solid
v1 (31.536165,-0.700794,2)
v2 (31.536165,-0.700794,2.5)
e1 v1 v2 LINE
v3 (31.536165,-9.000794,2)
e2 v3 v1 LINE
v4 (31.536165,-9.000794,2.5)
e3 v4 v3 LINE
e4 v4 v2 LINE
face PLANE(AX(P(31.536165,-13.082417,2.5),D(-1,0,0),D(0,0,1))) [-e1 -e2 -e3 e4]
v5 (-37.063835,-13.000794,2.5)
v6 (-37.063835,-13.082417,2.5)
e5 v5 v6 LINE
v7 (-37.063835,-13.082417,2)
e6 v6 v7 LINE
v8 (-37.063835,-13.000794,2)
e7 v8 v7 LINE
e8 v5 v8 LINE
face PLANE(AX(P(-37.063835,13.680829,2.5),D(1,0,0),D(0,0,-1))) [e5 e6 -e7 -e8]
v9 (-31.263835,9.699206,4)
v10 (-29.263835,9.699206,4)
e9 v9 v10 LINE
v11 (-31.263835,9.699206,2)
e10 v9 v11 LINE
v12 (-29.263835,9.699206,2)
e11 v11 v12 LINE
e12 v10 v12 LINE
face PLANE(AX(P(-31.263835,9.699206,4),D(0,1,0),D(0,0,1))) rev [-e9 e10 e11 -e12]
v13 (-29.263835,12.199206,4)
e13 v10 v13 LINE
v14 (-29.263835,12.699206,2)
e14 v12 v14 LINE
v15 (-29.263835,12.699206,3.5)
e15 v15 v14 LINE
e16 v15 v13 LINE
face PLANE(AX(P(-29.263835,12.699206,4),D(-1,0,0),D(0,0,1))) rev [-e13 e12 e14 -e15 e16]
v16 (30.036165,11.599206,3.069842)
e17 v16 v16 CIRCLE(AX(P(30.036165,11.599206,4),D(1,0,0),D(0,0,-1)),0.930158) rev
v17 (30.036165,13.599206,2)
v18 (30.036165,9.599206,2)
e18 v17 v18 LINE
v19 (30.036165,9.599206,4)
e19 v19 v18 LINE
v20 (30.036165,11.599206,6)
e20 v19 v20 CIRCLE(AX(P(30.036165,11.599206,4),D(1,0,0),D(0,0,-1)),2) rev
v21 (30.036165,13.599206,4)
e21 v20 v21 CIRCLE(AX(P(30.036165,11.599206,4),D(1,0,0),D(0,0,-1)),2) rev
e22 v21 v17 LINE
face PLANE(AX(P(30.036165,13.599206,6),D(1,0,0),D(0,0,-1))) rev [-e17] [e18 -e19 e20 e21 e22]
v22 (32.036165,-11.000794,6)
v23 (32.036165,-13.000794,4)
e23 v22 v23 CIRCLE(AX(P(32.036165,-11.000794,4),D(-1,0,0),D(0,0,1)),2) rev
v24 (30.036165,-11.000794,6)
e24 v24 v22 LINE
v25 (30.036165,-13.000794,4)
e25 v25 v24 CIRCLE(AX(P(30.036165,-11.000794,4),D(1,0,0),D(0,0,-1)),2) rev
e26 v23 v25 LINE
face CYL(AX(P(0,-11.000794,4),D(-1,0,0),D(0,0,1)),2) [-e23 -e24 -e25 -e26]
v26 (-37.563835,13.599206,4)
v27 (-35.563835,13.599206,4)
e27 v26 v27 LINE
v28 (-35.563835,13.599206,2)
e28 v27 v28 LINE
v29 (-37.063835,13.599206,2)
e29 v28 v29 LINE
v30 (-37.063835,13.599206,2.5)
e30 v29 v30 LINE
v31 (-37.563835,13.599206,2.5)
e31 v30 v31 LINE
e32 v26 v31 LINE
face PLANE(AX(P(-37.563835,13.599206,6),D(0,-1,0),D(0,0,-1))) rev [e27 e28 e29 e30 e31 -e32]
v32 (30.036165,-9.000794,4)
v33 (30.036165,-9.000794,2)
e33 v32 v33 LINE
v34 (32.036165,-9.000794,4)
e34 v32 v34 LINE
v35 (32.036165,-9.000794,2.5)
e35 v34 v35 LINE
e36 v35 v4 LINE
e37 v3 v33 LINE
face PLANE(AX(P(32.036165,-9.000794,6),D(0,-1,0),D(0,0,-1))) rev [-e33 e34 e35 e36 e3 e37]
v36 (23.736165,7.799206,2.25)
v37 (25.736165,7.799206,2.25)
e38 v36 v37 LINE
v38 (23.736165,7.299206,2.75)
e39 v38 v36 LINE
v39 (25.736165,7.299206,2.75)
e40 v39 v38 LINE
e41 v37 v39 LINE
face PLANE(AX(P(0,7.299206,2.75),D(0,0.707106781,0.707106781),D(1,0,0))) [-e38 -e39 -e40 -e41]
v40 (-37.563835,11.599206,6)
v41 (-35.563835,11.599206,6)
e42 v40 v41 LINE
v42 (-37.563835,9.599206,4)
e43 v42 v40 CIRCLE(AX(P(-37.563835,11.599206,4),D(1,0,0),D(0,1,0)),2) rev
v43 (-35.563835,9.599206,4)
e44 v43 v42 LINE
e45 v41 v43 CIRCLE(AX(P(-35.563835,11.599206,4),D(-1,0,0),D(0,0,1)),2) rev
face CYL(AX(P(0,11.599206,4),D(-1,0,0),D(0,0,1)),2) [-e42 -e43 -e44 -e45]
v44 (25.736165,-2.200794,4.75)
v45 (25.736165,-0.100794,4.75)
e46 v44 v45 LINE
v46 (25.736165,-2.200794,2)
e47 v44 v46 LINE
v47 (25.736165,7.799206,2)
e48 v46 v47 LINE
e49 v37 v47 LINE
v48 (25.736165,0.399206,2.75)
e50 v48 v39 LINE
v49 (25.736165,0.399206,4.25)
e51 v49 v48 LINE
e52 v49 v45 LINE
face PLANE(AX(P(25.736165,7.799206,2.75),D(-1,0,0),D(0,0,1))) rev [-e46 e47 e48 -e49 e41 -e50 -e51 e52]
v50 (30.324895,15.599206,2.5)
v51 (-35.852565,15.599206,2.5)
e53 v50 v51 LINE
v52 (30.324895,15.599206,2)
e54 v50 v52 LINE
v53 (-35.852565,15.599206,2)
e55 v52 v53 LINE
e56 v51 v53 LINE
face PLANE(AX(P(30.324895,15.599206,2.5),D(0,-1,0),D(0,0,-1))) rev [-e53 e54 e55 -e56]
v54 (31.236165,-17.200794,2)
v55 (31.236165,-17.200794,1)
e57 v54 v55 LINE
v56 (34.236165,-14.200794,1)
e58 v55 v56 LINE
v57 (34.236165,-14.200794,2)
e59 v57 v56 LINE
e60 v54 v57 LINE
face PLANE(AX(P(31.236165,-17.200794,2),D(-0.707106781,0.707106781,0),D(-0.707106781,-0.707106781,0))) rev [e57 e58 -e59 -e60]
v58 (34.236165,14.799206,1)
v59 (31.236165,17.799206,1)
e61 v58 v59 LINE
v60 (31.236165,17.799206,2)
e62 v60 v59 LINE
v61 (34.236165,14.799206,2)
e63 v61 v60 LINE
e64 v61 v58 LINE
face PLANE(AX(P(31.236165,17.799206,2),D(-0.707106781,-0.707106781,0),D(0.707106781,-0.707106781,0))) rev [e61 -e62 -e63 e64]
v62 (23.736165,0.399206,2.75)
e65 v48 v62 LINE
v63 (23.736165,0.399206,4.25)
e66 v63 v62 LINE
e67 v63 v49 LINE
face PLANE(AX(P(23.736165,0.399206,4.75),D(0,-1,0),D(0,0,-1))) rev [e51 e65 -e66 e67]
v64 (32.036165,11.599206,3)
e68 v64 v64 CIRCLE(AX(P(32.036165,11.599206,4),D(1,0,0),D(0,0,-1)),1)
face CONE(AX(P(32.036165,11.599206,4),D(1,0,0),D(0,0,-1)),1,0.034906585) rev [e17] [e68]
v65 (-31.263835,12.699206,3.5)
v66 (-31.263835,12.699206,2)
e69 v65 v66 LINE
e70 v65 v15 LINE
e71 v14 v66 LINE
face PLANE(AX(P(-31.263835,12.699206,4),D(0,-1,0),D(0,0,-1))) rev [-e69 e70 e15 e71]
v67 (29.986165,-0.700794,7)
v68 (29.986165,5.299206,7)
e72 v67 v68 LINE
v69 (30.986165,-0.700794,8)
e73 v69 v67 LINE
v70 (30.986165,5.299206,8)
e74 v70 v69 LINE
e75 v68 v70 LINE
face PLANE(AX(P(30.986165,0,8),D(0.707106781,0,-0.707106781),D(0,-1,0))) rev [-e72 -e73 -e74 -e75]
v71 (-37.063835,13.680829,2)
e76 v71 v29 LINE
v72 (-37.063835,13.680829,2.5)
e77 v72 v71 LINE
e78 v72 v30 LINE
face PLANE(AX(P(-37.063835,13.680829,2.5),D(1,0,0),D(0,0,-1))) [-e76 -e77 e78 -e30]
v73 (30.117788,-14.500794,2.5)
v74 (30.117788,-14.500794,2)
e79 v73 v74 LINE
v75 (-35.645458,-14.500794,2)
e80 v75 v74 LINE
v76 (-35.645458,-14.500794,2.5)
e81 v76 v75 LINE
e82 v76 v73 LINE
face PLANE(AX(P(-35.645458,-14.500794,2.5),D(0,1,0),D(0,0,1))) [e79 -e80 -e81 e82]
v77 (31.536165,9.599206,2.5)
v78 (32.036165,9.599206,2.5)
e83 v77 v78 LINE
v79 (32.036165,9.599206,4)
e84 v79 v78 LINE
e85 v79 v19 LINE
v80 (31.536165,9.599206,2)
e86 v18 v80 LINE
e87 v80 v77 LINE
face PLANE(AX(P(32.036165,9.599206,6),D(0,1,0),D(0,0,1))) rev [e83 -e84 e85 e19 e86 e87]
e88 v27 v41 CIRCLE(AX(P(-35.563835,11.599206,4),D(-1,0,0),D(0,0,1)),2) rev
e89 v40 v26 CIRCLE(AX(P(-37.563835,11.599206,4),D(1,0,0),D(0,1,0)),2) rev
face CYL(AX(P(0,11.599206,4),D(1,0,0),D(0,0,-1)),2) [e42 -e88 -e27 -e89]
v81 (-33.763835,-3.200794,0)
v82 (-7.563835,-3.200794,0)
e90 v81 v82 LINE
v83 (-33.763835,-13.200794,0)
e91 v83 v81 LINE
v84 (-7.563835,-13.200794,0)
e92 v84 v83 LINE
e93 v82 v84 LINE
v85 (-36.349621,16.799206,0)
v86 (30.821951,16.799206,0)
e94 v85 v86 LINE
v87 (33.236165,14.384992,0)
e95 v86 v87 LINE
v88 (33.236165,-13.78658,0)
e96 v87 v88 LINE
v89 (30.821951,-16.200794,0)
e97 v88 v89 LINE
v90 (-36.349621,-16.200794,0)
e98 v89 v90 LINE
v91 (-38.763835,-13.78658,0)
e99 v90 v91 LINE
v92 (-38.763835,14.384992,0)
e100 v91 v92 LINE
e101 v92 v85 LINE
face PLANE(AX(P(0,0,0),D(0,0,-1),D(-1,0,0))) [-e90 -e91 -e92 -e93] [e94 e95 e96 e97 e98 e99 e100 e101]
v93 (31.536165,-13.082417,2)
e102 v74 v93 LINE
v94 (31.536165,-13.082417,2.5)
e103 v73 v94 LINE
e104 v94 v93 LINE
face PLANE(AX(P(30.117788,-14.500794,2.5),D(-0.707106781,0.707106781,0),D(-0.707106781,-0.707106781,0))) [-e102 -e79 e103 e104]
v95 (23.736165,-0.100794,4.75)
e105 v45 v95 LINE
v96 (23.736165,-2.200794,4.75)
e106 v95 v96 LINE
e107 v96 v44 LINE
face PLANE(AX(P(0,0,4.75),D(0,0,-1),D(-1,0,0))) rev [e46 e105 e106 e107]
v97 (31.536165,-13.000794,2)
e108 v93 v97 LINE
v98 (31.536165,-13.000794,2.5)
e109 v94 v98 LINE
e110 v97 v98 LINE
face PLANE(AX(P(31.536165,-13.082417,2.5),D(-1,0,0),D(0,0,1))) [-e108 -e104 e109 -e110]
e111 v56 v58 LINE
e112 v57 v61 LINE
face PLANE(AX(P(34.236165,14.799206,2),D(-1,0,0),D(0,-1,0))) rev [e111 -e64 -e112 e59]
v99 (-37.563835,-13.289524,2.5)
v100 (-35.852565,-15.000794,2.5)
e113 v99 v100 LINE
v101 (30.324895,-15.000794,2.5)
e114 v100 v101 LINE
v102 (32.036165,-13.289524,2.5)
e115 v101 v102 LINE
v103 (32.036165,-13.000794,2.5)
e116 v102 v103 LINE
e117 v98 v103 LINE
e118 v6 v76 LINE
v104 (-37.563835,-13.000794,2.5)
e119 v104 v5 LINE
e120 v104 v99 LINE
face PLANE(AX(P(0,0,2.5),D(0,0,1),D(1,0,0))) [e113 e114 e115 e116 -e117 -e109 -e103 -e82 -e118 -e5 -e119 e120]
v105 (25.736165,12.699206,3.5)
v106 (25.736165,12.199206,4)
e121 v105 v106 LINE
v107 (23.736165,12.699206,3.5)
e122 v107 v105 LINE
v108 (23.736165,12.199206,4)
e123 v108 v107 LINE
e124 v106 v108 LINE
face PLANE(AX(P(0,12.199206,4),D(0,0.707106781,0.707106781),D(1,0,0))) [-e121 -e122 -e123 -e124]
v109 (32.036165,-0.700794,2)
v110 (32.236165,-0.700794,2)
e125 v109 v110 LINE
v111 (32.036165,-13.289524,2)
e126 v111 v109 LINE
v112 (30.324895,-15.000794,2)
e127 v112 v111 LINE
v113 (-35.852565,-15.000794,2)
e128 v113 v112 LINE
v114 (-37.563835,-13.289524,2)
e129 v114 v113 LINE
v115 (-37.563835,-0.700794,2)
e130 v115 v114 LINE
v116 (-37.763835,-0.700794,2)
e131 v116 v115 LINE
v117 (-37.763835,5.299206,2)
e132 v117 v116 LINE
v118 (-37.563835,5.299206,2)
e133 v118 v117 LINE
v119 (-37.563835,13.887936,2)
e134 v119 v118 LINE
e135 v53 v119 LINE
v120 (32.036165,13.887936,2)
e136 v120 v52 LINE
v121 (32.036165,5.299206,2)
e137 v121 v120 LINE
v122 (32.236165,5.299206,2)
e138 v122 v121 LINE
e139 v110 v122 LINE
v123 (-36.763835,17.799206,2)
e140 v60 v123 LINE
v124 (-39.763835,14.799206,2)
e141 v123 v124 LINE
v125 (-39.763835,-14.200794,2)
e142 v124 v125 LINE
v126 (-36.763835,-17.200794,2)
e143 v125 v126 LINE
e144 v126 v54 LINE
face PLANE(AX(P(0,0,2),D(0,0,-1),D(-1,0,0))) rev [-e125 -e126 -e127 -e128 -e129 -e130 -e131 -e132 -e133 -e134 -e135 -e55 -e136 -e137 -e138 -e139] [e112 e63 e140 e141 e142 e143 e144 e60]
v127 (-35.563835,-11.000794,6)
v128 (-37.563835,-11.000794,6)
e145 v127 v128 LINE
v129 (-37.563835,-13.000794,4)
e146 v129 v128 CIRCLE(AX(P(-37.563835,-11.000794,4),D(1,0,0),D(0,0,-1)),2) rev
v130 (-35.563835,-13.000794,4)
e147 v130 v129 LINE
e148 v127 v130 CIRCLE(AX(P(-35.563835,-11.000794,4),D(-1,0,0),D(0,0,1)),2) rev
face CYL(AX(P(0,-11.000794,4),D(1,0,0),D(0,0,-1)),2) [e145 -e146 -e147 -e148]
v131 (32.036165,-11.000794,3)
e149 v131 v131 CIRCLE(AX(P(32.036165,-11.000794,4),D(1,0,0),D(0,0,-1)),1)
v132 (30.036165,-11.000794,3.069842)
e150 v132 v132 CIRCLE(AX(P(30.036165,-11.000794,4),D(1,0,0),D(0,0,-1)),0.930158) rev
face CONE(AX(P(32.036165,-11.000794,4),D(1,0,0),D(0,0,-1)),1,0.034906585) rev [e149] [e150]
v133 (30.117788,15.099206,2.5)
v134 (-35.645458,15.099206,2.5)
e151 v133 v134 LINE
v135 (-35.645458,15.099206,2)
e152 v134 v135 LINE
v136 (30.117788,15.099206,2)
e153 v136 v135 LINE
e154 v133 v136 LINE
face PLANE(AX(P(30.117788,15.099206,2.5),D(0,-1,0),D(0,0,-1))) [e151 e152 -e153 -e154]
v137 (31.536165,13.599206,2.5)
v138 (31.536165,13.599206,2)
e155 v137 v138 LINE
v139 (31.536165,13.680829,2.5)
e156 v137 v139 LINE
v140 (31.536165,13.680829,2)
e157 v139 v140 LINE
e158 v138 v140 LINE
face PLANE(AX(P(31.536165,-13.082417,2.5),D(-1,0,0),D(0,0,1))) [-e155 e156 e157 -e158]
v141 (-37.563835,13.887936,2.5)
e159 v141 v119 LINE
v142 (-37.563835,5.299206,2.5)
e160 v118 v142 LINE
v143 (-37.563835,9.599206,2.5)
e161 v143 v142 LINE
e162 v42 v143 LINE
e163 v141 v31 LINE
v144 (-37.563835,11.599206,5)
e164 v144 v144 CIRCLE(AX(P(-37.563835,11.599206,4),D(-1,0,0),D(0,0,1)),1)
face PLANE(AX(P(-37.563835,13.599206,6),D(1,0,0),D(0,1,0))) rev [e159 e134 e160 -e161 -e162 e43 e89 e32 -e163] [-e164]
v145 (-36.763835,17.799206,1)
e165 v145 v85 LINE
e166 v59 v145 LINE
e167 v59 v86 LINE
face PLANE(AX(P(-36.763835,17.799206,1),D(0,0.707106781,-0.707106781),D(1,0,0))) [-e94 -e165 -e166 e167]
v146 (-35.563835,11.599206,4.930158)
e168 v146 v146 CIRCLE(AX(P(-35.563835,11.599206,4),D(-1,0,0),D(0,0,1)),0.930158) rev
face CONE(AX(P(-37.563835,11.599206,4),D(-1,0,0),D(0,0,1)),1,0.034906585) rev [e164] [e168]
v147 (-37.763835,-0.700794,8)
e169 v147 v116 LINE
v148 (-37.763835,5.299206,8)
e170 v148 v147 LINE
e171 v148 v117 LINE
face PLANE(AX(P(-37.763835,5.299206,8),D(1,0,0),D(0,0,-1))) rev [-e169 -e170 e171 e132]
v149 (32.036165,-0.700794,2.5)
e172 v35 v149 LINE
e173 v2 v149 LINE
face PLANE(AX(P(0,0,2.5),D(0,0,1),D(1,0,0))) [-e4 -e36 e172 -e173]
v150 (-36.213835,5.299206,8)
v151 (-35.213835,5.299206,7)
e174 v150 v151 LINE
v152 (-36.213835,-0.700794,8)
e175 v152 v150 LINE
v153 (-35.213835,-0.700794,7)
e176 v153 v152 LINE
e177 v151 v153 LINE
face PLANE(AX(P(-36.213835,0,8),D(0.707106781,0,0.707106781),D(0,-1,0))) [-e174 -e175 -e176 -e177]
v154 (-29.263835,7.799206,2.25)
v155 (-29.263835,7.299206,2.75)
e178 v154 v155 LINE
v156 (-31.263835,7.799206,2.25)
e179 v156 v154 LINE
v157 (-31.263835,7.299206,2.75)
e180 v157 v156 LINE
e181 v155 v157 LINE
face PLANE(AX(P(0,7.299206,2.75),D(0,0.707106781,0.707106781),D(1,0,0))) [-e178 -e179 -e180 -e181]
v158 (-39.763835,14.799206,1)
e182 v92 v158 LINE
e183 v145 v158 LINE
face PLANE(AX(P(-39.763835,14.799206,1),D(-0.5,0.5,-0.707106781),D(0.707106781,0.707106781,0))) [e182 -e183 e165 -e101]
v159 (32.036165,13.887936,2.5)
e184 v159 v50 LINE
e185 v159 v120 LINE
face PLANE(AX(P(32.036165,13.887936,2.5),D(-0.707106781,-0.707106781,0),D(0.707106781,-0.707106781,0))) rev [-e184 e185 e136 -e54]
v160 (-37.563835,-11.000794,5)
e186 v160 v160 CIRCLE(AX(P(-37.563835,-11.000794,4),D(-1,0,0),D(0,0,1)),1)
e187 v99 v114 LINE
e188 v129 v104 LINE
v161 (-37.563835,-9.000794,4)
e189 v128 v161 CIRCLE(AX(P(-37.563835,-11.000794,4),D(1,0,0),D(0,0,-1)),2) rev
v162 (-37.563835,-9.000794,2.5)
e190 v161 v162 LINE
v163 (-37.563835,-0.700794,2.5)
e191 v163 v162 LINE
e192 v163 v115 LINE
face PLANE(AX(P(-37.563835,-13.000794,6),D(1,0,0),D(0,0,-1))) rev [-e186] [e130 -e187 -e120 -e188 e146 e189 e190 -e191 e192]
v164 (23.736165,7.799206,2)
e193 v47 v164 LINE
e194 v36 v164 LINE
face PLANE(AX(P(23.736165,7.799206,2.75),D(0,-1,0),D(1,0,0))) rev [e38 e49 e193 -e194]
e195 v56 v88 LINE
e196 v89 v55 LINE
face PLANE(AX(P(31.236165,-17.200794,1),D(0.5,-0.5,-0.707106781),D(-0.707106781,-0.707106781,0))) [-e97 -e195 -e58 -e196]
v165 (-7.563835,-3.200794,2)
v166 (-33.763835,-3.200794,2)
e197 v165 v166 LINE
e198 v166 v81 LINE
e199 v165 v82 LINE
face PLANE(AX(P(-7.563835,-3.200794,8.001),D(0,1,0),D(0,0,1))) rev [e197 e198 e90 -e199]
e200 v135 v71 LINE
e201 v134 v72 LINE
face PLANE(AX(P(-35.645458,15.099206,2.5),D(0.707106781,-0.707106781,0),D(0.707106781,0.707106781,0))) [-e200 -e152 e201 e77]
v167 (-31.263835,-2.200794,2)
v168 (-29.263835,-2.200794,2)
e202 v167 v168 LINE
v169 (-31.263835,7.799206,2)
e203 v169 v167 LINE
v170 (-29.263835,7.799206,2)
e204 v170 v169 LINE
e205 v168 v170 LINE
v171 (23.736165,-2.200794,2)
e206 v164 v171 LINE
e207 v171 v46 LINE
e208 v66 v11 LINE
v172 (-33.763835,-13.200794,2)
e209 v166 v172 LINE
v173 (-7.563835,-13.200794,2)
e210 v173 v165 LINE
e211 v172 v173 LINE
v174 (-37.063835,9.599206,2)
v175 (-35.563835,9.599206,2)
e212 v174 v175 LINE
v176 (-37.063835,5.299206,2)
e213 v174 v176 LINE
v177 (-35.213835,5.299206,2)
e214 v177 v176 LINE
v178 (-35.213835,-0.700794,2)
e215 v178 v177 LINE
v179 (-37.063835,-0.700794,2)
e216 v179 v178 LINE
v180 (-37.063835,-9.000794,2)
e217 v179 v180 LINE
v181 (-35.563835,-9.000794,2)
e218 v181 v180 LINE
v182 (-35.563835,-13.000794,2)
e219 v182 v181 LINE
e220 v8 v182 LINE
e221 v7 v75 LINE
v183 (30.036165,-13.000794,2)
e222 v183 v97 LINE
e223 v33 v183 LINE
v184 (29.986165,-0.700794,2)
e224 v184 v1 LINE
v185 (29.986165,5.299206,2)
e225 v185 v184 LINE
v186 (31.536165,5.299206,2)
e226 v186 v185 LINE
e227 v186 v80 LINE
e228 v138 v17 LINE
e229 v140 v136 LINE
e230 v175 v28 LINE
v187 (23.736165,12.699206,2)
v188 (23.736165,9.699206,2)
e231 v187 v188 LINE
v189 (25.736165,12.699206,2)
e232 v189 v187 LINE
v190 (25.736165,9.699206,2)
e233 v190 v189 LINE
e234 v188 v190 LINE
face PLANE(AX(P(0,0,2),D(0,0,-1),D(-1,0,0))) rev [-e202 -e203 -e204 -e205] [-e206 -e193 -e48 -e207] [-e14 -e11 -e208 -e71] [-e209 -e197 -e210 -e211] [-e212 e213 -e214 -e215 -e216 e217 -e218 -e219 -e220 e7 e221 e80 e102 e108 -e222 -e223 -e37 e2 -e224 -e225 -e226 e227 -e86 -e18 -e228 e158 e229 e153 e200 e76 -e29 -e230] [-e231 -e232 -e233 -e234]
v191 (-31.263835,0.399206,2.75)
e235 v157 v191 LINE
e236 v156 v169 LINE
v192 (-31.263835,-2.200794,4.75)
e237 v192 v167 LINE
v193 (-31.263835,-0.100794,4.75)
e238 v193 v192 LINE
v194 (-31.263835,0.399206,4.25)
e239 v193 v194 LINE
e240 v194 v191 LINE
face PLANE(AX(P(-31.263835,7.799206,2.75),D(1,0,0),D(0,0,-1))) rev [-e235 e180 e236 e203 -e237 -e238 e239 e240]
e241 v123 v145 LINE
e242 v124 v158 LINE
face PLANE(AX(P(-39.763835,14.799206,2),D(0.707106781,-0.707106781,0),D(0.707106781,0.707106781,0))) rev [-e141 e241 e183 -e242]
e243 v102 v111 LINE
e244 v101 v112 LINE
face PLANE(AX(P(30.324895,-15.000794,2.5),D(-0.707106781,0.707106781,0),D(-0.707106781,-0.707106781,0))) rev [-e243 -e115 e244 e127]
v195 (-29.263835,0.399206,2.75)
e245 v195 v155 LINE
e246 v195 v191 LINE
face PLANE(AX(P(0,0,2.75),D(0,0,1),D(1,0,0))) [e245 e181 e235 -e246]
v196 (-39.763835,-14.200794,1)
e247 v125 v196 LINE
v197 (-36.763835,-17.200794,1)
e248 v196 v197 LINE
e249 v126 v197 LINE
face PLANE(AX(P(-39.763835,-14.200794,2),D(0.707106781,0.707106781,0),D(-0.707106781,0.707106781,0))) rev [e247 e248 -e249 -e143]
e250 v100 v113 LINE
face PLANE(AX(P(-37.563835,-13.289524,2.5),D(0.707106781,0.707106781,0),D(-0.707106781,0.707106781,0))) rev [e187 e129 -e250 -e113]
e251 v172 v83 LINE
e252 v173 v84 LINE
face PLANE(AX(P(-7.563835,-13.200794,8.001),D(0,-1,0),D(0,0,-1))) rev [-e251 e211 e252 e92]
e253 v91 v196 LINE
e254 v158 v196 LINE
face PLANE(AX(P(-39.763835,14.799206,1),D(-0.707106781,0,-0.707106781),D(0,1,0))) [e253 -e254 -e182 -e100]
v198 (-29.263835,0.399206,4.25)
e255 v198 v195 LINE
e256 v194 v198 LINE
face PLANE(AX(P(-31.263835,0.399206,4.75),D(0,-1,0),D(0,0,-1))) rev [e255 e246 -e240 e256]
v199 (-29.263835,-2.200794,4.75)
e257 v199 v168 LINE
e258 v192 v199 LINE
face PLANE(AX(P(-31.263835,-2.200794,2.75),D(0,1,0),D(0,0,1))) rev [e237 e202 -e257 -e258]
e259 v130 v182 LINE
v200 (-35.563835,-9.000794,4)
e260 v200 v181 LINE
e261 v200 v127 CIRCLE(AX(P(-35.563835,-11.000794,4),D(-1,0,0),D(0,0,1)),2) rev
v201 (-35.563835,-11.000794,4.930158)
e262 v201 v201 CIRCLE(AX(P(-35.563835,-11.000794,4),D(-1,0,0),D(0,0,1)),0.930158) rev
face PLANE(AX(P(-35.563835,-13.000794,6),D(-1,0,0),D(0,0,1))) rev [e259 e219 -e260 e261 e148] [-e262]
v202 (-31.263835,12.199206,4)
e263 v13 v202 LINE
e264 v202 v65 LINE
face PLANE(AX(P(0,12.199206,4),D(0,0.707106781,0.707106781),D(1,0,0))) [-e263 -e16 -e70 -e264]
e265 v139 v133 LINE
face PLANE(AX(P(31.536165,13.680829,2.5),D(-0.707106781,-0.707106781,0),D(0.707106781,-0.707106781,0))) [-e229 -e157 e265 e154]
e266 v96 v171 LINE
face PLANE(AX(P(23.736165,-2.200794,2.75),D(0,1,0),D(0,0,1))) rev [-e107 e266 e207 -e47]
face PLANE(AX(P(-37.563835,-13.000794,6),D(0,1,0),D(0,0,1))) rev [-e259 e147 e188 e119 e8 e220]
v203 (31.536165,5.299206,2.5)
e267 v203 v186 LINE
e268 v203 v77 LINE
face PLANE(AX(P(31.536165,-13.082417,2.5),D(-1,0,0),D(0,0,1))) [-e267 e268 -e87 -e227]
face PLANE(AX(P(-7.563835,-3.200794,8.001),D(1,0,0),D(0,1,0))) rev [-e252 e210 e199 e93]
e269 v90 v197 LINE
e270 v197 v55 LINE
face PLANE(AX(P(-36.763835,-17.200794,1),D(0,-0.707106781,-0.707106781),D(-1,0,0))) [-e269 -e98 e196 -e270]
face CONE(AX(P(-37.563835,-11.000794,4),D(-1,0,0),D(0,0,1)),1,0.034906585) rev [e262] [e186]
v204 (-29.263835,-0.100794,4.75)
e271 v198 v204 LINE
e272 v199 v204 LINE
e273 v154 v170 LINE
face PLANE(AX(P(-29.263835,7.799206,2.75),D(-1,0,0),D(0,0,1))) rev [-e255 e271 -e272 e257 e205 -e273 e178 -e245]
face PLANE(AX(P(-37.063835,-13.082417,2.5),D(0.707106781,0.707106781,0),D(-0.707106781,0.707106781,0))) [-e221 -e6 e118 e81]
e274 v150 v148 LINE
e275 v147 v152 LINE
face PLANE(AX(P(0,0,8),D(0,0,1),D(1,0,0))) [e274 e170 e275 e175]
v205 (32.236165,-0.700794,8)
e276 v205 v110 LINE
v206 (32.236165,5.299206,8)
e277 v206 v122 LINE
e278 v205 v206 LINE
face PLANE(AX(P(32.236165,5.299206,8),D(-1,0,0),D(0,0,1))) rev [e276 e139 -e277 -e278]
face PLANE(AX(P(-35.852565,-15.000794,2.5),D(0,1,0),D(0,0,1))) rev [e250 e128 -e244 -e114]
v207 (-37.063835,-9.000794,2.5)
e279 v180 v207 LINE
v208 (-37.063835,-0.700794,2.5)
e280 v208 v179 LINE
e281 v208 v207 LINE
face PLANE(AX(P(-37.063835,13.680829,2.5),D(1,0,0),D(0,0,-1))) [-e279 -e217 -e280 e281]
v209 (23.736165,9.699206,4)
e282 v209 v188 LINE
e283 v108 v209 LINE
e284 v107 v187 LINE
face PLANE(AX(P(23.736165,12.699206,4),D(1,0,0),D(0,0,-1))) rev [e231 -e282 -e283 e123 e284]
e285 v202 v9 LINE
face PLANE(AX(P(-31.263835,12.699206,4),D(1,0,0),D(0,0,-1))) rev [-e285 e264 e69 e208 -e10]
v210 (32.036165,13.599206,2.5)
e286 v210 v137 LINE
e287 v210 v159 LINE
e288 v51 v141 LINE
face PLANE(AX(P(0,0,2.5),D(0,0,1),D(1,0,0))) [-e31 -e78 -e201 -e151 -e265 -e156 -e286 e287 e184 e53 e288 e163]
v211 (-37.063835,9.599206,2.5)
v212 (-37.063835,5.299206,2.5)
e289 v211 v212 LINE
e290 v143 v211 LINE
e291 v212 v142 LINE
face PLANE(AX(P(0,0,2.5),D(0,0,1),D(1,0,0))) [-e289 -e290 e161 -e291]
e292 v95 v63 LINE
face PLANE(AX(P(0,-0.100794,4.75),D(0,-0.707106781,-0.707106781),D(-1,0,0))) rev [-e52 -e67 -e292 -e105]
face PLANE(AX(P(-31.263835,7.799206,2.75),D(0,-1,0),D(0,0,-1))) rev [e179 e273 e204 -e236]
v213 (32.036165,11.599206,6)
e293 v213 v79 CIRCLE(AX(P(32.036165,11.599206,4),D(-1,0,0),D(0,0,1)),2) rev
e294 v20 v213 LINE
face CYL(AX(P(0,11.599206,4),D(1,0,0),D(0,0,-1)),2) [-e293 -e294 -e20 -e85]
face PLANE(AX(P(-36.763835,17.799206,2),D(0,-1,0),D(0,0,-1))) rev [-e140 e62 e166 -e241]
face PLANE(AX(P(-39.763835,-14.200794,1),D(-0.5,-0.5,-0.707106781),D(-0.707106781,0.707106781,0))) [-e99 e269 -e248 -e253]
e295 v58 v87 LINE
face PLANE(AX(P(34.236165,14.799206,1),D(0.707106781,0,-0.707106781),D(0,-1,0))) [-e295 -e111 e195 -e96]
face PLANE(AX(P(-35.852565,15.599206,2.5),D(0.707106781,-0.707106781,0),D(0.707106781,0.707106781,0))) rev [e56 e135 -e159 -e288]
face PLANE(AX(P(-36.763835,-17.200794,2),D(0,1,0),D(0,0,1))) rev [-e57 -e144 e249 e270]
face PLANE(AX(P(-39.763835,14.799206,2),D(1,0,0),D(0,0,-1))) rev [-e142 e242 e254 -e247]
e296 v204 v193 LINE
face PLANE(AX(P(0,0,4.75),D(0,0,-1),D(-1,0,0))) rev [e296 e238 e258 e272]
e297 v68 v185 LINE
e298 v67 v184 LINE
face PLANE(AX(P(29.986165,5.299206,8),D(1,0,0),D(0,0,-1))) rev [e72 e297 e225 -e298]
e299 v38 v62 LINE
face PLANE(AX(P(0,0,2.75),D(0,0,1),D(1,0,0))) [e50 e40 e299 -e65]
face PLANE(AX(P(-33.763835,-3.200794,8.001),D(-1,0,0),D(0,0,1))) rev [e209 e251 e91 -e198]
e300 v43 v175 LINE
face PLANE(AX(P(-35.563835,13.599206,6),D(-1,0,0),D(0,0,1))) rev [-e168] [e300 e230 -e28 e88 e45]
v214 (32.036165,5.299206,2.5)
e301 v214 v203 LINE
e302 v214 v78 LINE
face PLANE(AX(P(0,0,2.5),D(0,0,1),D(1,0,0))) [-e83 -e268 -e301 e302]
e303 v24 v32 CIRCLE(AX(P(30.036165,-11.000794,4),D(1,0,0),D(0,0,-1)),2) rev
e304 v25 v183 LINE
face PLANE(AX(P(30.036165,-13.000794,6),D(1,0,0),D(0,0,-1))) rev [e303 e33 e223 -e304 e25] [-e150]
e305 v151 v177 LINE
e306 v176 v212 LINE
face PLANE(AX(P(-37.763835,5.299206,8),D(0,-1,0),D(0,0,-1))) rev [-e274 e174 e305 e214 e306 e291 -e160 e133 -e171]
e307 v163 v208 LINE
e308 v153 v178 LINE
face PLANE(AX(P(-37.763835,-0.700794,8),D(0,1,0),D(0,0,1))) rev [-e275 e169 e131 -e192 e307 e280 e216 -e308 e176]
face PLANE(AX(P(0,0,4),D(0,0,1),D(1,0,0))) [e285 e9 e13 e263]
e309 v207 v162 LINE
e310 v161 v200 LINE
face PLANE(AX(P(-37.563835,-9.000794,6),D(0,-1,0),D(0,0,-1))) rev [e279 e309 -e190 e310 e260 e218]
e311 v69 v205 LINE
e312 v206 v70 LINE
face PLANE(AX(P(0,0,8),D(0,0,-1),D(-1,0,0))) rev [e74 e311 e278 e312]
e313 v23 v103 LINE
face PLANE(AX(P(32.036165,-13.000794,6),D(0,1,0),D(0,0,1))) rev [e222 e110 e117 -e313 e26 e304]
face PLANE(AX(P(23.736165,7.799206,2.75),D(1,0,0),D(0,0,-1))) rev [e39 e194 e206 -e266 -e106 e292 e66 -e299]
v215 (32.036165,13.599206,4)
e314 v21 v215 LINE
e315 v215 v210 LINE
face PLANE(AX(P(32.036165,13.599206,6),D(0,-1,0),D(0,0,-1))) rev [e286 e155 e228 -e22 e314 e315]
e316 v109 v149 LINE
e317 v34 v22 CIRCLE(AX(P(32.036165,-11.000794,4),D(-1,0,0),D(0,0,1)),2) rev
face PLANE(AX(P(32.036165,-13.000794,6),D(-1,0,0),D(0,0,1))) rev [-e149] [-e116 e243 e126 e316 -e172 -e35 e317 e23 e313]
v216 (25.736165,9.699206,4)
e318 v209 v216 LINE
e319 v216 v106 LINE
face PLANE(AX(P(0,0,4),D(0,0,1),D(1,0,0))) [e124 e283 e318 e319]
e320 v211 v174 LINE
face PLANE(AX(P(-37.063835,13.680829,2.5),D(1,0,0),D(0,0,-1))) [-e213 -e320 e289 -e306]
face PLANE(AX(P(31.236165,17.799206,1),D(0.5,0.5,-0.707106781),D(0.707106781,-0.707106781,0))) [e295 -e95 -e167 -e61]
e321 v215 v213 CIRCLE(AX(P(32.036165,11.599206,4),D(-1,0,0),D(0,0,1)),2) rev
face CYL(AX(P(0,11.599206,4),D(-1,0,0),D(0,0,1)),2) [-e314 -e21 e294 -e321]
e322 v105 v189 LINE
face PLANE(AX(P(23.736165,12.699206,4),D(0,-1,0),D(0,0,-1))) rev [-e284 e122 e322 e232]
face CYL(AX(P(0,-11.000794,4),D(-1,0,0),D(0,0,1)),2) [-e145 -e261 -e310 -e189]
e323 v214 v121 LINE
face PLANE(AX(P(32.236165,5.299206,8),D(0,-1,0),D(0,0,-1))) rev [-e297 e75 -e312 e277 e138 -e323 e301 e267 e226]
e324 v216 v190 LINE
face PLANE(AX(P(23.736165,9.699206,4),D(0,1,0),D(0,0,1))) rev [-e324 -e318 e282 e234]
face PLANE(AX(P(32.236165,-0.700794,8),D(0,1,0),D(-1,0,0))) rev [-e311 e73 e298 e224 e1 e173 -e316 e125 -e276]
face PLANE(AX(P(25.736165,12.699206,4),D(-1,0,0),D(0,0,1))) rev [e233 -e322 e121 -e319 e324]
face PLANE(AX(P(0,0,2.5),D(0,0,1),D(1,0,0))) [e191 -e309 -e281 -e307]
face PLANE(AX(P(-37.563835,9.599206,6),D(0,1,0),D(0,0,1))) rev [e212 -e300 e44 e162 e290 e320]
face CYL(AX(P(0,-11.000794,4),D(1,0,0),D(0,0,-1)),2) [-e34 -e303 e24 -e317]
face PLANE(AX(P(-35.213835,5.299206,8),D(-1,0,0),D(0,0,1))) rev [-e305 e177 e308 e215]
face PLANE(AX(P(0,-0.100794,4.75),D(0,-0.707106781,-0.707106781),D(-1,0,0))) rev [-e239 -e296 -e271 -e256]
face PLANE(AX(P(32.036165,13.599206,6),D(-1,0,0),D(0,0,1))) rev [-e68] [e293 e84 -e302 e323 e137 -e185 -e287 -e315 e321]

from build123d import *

# Parameters (mm, degrees)
EXTRUDE_1_DEPTH               = 2
CHAMFER_1_SIZE                = 1
SKETCH_3_W                    = 2
SKETCH_3_H                    = 4
EXTRUDE_2_DEPTH               = 4
FILLET_1_R                    = 2
SKETCH_4_R                    = 1
CUT_EXTRUDE_1_DEPTH           = 2
CUT_EXTRUDE_1_DRAFT           = -2
CUT_EXTRUDE_1_PROFILE_2_DEPTH = 2
CUT_EXTRUDE_1_PROFILE_2_DRAFT = -2
SKETCH_5_R                    = 1
CUT_EXTRUDE_2_DEPTH           = 2
CUT_EXTRUDE_2_DRAFT           = -2
CUT_EXTRUDE_2_PROFILE_2_DEPTH = 2
CUT_EXTRUDE_2_PROFILE_2_DRAFT = -2
SKETCH_6_W                    = 2
SKETCH_6_H                    = 10
EXTRUDE_3_DEPTH               = 0.75
SKETCH_7_W                    = 2
SKETCH_7_H                    = 2.6
EXTRUDE_4_DEPTH               = 2
CHAMFER_2_SIZE                = 0.5
SKETCH_8_W                    = 2.55
SKETCH_8_H                    = 6
SKETCH_8_W_2                  = 2.25
EXTRUDE_5_DEPTH               = 6
CHAMFER_3_SIZE                = 1
SKETCH_9_W                    = 2
SKETCH_9_H                    = 3
EXTRUDE_6_DEPTH               = 2
CHAMFER_4_SIZE                = 0.5
CUT_EXTRUDE_3_REACH           = 46.294
SKETCH_10_W                   = 26.2
SKETCH_10_H                   = 10
EXTRUDE_7_DEPTH               = 0.5


with BuildPart() as part:
    # 草图1 → 凸台-拉伸1 (new body)
    with BuildSketch(Plane.XY):
        Polygon((-39.76383505, 14.799206062), (-36.76383505, 17.799206062), (31.23616495, 17.799206062), (34.23616495, 14.799206062), (34.23616495, -14.200793938), (31.23616495, -17.200793938), (-36.76383505, -17.200793938), (-39.76383505, -14.200793938), align=None)
    extrude(amount=EXTRUDE_1_DEPTH)

    # 倒角1
    chamfer_1_edges = [part.edges().sort_by_distance(p)[0] for p in [
        (-38.26383505, -15.700793938, 0),
        (-39.76383505, 0.299206062, 0),
        (-38.26383505, 16.299206062, 0),
        (-2.76383505, 17.799206062, 0),
        (32.73616495, 16.299206062, 0),
        (34.23616495, 0.299206062, 0),
        (32.73616495, -15.700793938, 0),
        (-2.76383505, -17.200793938, 0),
    ]]
    chamfer(chamfer_1_edges, length=CHAMFER_1_SIZE)

    # 草图3 → 凸台-拉伸2 (add)
    with BuildSketch(Plane.XY.offset(2)):
        with Locations((-36.56383505, 11.599206062)):
            Rectangle(SKETCH_3_W, SKETCH_3_H)
        with Locations((-36.56383505, -11.000793938)):
            Rectangle(SKETCH_3_W, SKETCH_3_H)
        with Locations((31.03616495, 11.599206062)):
            Rectangle(SKETCH_3_W, SKETCH_3_H)
        with Locations((31.03616495, -11.000793938)):
            Rectangle(SKETCH_3_W, SKETCH_3_H)
    extrude(amount=EXTRUDE_2_DEPTH)

    # 圆角1
    fillet_1_edges = [part.edges().sort_by_distance(p)[0] for p in [
        (31.03616495, 13.599206062, 6),
        (31.03616495, 9.599206062, 6),
        (31.03616495, -9.000793938, 6),
        (31.03616495, -13.000793938, 6),
        (-36.56383505, -13.000793938, 6),
        (-36.56383505, -9.000793938, 6),
        (-36.56383505, 13.599206062, 6),
        (-36.56383505, 9.599206062, 6),
    ]]
    fillet(fillet_1_edges, radius=FILLET_1_R - 0.0001)  # a hair under: the kernel refuses the full size


with BuildPart() as cut_extrude_1_tool:
    # 草图4 → 切除-拉伸1 (with draft: the straight prism first)
    with BuildSketch(Plane(origin=(32.03616495, 0, 0), x_dir=(0, 0, -1), z_dir=(1, 0, 0))):
        with Locations((-4, 11.599206062)):
            Circle(SKETCH_4_R)
    extrude(amount=-CUT_EXTRUDE_1_DEPTH)
    # 切除-拉伸1: the draft: its side faces are tilted about the plane it starts from
    cut_extrude_1_sides = [cut_extrude_1_tool.faces().sort_by_distance(p)[0] for p in [
        (31.03616495, 11.599206062, 5),
    ]]
    draft(cut_extrude_1_sides, Plane(origin=(32.03616495, 0, 0), x_dir=(0, 0, -1), z_dir=(1, 0, 0)), CUT_EXTRUDE_1_DRAFT)


with BuildPart() as part_1:
    add(part.part)

    # 切除-拉伸1: cut by cut_extrude_1_tool
    add(cut_extrude_1_tool.part, mode=Mode.SUBTRACT)


with BuildPart() as cut_extrude_1_profile_2_tool:
    # 草图4 → 切除-拉伸1 profile 2 (with draft: the straight prism first)
    with BuildSketch(Plane(origin=(32.03616495, 0, 0), x_dir=(0, 0, -1), z_dir=(1, 0, 0))):
        with Locations((-4, -11.000793938)):
            Circle(SKETCH_4_R)
    extrude(amount=-CUT_EXTRUDE_1_PROFILE_2_DEPTH)
    # 切除-拉伸1 profile 2: the draft: its side faces are tilted about the plane it starts from
    cut_extrude_1_profile_2_sides = [cut_extrude_1_profile_2_tool.faces().sort_by_distance(p)[0] for p in [
        (31.03616495, -11.000793938, 5),
    ]]
    draft(cut_extrude_1_profile_2_sides, Plane(origin=(32.03616495, 0, 0), x_dir=(0, 0, -1), z_dir=(1, 0, 0)), CUT_EXTRUDE_1_PROFILE_2_DRAFT)


with BuildPart() as part_2:
    add(part_1.part)

    # 切除-拉伸1 profile 2: cut by cut_extrude_1_profile_2_tool
    add(cut_extrude_1_profile_2_tool.part, mode=Mode.SUBTRACT)


with BuildPart() as cut_extrude_2_tool:
    # 草图5 → 切除-拉伸2 (with draft: the straight prism first)
    with BuildSketch(Plane.ZY.offset(37.56383505)):
        with Locations((4, 11.599206062)):
            Circle(SKETCH_5_R)
    extrude(amount=-CUT_EXTRUDE_2_DEPTH)
    # 切除-拉伸2: the draft: its side faces are tilted about the plane it starts from
    cut_extrude_2_sides = [cut_extrude_2_tool.faces().sort_by_distance(p)[0] for p in [
        (-36.56383505, 11.599206062, 3),
    ]]
    draft(cut_extrude_2_sides, Plane.ZY.offset(37.56383505), CUT_EXTRUDE_2_DRAFT)


with BuildPart() as part_3:
    add(part_2.part)

    # 切除-拉伸2: cut by cut_extrude_2_tool
    add(cut_extrude_2_tool.part, mode=Mode.SUBTRACT)


with BuildPart() as cut_extrude_2_profile_2_tool:
    # 草图5 → 切除-拉伸2 profile 2 (with draft: the straight prism first)
    with BuildSketch(Plane.ZY.offset(37.56383505)):
        with Locations((4, -11.000793938)):
            Circle(SKETCH_5_R)
    extrude(amount=-CUT_EXTRUDE_2_PROFILE_2_DEPTH)
    # 切除-拉伸2 profile 2: the draft: its side faces are tilted about the plane it starts from
    cut_extrude_2_profile_2_sides = [cut_extrude_2_profile_2_tool.faces().sort_by_distance(p)[0] for p in [
        (-36.56383505, -11.000793938, 3),
    ]]
    draft(cut_extrude_2_profile_2_sides, Plane.ZY.offset(37.56383505), CUT_EXTRUDE_2_PROFILE_2_DRAFT)


with BuildPart() as part_4:
    add(part_3.part)

    # 切除-拉伸2 profile 2: cut by cut_extrude_2_profile_2_tool
    add(cut_extrude_2_profile_2_tool.part, mode=Mode.SUBTRACT)

    # 草图6 → 凸台-拉伸3 (add)
    with BuildSketch(Plane.XY.offset(2)):
        with Locations((-30.26383505, 2.799206062)):
            Rectangle(SKETCH_6_W, SKETCH_6_H)
        with Locations((24.73616495, 2.799206062)):
            Rectangle(SKETCH_6_W, SKETCH_6_H)
    extrude(amount=EXTRUDE_3_DEPTH)

    # 草图7 → 凸台-拉伸4 (add)
    with BuildSketch(Plane.XY.offset(2.75)):
        with Locations((-30.26383505, -0.900793938)):
            Rectangle(SKETCH_7_W, SKETCH_7_H)
        with Locations((24.73616495, -0.900793938)):
            Rectangle(SKETCH_7_W, SKETCH_7_H)
    extrude(amount=EXTRUDE_4_DEPTH)

    # 倒角2
    chamfer_2_edges = [part_4.edges().sort_by_distance(p)[0] for p in [
        (-30.26383505, 7.799206062, 2.75),
        (24.73616495, 7.799206062, 2.75),
        (-30.26383505, 0.399206062, 4.75),
        (24.73616495, 0.399206062, 4.75),
    ]]
    chamfer(chamfer_2_edges, length=CHAMFER_2_SIZE)

    # 草图8 → 凸台-拉伸5 (add)
    with BuildSketch(Plane.XY.offset(2)):
        with Locations((-36.48883505, 2.299206062)):
            Rectangle(SKETCH_8_W, SKETCH_8_H)
        with Locations((31.11116495, 2.299206062)):
            Rectangle(SKETCH_8_W_2, SKETCH_8_H)
    extrude(amount=EXTRUDE_5_DEPTH)

    # 倒角3
    chamfer_3_edges = [part_4.edges().sort_by_distance(p)[0] for p in [
        (-35.21383505, 2.299206062, 8),
        (29.98616495, 2.299206062, 8),
    ]]
    chamfer(chamfer_3_edges, length=CHAMFER_3_SIZE)

    # 草图9 → 凸台-拉伸6 (add)
    with BuildSketch(Plane.XY.offset(2)):
        with Locations((-30.26383505, 11.199206062)):
            Rectangle(SKETCH_9_W, SKETCH_9_H)
        with Locations((24.73616495, 11.199206062)):
            Rectangle(SKETCH_9_W, SKETCH_9_H)
    extrude(amount=EXTRUDE_6_DEPTH)

    # 倒角4
    chamfer_4_edges = [part_4.edges().sort_by_distance(p)[0] for p in [
        (-30.26383505, 12.699206062, 4),
        (24.73616495, 12.699206062, 4),
    ]]
    chamfer(chamfer_4_edges, length=CHAMFER_4_SIZE)

    # 草图10 → 切除-拉伸3 (cut, up to next)
    with BuildSketch(Plane(origin=(0, 0, 0), x_dir=(-1, 0, 0), z_dir=(0, 0, -1)), mode=Mode.PRIVATE) as cut_extrude_3_sk1:
        with Locations((20.66383505, -8.200793938)):
            Rectangle(SKETCH_10_W, SKETCH_10_H)
    cut_extrude_3_tool1 = extrude(cut_extrude_3_sk1.sketch, amount=-CUT_EXTRUDE_3_REACH, mode=Mode.PRIVATE) & part_4.part
    add(cut_extrude_3_tool1.solids().sort_by_distance((-20.663835, -8.200794, 0))[0], mode=Mode.SUBTRACT)

    # 草图11 → 凸台-拉伸7 (add)
    with BuildSketch(Plane.XY.offset(2)):
        Polygon((30.324895113, 15.599206062), (-35.852565213, 15.599206062), (-37.56383505, 13.887936224), (-37.56383505, -13.289524101), (-35.852565213, -15.000793938), (30.324895113, -15.000793938), (32.03616495, -13.289524101), (32.03616495, 13.887936224), align=None)
        Polygon((30.117788331, 15.099206062), (-35.645458432, 15.099206062), (-37.06383505, 13.680829443), (-37.06383505, -13.08241732), (-35.645458432, -14.500793938), (30.117788331, -14.500793938), (31.53616495, -13.08241732), (31.53616495, 13.680829443), align=None, mode=Mode.SUBTRACT)
    extrude(amount=EXTRUDE_7_DEPTH)


solid = part_4.part
